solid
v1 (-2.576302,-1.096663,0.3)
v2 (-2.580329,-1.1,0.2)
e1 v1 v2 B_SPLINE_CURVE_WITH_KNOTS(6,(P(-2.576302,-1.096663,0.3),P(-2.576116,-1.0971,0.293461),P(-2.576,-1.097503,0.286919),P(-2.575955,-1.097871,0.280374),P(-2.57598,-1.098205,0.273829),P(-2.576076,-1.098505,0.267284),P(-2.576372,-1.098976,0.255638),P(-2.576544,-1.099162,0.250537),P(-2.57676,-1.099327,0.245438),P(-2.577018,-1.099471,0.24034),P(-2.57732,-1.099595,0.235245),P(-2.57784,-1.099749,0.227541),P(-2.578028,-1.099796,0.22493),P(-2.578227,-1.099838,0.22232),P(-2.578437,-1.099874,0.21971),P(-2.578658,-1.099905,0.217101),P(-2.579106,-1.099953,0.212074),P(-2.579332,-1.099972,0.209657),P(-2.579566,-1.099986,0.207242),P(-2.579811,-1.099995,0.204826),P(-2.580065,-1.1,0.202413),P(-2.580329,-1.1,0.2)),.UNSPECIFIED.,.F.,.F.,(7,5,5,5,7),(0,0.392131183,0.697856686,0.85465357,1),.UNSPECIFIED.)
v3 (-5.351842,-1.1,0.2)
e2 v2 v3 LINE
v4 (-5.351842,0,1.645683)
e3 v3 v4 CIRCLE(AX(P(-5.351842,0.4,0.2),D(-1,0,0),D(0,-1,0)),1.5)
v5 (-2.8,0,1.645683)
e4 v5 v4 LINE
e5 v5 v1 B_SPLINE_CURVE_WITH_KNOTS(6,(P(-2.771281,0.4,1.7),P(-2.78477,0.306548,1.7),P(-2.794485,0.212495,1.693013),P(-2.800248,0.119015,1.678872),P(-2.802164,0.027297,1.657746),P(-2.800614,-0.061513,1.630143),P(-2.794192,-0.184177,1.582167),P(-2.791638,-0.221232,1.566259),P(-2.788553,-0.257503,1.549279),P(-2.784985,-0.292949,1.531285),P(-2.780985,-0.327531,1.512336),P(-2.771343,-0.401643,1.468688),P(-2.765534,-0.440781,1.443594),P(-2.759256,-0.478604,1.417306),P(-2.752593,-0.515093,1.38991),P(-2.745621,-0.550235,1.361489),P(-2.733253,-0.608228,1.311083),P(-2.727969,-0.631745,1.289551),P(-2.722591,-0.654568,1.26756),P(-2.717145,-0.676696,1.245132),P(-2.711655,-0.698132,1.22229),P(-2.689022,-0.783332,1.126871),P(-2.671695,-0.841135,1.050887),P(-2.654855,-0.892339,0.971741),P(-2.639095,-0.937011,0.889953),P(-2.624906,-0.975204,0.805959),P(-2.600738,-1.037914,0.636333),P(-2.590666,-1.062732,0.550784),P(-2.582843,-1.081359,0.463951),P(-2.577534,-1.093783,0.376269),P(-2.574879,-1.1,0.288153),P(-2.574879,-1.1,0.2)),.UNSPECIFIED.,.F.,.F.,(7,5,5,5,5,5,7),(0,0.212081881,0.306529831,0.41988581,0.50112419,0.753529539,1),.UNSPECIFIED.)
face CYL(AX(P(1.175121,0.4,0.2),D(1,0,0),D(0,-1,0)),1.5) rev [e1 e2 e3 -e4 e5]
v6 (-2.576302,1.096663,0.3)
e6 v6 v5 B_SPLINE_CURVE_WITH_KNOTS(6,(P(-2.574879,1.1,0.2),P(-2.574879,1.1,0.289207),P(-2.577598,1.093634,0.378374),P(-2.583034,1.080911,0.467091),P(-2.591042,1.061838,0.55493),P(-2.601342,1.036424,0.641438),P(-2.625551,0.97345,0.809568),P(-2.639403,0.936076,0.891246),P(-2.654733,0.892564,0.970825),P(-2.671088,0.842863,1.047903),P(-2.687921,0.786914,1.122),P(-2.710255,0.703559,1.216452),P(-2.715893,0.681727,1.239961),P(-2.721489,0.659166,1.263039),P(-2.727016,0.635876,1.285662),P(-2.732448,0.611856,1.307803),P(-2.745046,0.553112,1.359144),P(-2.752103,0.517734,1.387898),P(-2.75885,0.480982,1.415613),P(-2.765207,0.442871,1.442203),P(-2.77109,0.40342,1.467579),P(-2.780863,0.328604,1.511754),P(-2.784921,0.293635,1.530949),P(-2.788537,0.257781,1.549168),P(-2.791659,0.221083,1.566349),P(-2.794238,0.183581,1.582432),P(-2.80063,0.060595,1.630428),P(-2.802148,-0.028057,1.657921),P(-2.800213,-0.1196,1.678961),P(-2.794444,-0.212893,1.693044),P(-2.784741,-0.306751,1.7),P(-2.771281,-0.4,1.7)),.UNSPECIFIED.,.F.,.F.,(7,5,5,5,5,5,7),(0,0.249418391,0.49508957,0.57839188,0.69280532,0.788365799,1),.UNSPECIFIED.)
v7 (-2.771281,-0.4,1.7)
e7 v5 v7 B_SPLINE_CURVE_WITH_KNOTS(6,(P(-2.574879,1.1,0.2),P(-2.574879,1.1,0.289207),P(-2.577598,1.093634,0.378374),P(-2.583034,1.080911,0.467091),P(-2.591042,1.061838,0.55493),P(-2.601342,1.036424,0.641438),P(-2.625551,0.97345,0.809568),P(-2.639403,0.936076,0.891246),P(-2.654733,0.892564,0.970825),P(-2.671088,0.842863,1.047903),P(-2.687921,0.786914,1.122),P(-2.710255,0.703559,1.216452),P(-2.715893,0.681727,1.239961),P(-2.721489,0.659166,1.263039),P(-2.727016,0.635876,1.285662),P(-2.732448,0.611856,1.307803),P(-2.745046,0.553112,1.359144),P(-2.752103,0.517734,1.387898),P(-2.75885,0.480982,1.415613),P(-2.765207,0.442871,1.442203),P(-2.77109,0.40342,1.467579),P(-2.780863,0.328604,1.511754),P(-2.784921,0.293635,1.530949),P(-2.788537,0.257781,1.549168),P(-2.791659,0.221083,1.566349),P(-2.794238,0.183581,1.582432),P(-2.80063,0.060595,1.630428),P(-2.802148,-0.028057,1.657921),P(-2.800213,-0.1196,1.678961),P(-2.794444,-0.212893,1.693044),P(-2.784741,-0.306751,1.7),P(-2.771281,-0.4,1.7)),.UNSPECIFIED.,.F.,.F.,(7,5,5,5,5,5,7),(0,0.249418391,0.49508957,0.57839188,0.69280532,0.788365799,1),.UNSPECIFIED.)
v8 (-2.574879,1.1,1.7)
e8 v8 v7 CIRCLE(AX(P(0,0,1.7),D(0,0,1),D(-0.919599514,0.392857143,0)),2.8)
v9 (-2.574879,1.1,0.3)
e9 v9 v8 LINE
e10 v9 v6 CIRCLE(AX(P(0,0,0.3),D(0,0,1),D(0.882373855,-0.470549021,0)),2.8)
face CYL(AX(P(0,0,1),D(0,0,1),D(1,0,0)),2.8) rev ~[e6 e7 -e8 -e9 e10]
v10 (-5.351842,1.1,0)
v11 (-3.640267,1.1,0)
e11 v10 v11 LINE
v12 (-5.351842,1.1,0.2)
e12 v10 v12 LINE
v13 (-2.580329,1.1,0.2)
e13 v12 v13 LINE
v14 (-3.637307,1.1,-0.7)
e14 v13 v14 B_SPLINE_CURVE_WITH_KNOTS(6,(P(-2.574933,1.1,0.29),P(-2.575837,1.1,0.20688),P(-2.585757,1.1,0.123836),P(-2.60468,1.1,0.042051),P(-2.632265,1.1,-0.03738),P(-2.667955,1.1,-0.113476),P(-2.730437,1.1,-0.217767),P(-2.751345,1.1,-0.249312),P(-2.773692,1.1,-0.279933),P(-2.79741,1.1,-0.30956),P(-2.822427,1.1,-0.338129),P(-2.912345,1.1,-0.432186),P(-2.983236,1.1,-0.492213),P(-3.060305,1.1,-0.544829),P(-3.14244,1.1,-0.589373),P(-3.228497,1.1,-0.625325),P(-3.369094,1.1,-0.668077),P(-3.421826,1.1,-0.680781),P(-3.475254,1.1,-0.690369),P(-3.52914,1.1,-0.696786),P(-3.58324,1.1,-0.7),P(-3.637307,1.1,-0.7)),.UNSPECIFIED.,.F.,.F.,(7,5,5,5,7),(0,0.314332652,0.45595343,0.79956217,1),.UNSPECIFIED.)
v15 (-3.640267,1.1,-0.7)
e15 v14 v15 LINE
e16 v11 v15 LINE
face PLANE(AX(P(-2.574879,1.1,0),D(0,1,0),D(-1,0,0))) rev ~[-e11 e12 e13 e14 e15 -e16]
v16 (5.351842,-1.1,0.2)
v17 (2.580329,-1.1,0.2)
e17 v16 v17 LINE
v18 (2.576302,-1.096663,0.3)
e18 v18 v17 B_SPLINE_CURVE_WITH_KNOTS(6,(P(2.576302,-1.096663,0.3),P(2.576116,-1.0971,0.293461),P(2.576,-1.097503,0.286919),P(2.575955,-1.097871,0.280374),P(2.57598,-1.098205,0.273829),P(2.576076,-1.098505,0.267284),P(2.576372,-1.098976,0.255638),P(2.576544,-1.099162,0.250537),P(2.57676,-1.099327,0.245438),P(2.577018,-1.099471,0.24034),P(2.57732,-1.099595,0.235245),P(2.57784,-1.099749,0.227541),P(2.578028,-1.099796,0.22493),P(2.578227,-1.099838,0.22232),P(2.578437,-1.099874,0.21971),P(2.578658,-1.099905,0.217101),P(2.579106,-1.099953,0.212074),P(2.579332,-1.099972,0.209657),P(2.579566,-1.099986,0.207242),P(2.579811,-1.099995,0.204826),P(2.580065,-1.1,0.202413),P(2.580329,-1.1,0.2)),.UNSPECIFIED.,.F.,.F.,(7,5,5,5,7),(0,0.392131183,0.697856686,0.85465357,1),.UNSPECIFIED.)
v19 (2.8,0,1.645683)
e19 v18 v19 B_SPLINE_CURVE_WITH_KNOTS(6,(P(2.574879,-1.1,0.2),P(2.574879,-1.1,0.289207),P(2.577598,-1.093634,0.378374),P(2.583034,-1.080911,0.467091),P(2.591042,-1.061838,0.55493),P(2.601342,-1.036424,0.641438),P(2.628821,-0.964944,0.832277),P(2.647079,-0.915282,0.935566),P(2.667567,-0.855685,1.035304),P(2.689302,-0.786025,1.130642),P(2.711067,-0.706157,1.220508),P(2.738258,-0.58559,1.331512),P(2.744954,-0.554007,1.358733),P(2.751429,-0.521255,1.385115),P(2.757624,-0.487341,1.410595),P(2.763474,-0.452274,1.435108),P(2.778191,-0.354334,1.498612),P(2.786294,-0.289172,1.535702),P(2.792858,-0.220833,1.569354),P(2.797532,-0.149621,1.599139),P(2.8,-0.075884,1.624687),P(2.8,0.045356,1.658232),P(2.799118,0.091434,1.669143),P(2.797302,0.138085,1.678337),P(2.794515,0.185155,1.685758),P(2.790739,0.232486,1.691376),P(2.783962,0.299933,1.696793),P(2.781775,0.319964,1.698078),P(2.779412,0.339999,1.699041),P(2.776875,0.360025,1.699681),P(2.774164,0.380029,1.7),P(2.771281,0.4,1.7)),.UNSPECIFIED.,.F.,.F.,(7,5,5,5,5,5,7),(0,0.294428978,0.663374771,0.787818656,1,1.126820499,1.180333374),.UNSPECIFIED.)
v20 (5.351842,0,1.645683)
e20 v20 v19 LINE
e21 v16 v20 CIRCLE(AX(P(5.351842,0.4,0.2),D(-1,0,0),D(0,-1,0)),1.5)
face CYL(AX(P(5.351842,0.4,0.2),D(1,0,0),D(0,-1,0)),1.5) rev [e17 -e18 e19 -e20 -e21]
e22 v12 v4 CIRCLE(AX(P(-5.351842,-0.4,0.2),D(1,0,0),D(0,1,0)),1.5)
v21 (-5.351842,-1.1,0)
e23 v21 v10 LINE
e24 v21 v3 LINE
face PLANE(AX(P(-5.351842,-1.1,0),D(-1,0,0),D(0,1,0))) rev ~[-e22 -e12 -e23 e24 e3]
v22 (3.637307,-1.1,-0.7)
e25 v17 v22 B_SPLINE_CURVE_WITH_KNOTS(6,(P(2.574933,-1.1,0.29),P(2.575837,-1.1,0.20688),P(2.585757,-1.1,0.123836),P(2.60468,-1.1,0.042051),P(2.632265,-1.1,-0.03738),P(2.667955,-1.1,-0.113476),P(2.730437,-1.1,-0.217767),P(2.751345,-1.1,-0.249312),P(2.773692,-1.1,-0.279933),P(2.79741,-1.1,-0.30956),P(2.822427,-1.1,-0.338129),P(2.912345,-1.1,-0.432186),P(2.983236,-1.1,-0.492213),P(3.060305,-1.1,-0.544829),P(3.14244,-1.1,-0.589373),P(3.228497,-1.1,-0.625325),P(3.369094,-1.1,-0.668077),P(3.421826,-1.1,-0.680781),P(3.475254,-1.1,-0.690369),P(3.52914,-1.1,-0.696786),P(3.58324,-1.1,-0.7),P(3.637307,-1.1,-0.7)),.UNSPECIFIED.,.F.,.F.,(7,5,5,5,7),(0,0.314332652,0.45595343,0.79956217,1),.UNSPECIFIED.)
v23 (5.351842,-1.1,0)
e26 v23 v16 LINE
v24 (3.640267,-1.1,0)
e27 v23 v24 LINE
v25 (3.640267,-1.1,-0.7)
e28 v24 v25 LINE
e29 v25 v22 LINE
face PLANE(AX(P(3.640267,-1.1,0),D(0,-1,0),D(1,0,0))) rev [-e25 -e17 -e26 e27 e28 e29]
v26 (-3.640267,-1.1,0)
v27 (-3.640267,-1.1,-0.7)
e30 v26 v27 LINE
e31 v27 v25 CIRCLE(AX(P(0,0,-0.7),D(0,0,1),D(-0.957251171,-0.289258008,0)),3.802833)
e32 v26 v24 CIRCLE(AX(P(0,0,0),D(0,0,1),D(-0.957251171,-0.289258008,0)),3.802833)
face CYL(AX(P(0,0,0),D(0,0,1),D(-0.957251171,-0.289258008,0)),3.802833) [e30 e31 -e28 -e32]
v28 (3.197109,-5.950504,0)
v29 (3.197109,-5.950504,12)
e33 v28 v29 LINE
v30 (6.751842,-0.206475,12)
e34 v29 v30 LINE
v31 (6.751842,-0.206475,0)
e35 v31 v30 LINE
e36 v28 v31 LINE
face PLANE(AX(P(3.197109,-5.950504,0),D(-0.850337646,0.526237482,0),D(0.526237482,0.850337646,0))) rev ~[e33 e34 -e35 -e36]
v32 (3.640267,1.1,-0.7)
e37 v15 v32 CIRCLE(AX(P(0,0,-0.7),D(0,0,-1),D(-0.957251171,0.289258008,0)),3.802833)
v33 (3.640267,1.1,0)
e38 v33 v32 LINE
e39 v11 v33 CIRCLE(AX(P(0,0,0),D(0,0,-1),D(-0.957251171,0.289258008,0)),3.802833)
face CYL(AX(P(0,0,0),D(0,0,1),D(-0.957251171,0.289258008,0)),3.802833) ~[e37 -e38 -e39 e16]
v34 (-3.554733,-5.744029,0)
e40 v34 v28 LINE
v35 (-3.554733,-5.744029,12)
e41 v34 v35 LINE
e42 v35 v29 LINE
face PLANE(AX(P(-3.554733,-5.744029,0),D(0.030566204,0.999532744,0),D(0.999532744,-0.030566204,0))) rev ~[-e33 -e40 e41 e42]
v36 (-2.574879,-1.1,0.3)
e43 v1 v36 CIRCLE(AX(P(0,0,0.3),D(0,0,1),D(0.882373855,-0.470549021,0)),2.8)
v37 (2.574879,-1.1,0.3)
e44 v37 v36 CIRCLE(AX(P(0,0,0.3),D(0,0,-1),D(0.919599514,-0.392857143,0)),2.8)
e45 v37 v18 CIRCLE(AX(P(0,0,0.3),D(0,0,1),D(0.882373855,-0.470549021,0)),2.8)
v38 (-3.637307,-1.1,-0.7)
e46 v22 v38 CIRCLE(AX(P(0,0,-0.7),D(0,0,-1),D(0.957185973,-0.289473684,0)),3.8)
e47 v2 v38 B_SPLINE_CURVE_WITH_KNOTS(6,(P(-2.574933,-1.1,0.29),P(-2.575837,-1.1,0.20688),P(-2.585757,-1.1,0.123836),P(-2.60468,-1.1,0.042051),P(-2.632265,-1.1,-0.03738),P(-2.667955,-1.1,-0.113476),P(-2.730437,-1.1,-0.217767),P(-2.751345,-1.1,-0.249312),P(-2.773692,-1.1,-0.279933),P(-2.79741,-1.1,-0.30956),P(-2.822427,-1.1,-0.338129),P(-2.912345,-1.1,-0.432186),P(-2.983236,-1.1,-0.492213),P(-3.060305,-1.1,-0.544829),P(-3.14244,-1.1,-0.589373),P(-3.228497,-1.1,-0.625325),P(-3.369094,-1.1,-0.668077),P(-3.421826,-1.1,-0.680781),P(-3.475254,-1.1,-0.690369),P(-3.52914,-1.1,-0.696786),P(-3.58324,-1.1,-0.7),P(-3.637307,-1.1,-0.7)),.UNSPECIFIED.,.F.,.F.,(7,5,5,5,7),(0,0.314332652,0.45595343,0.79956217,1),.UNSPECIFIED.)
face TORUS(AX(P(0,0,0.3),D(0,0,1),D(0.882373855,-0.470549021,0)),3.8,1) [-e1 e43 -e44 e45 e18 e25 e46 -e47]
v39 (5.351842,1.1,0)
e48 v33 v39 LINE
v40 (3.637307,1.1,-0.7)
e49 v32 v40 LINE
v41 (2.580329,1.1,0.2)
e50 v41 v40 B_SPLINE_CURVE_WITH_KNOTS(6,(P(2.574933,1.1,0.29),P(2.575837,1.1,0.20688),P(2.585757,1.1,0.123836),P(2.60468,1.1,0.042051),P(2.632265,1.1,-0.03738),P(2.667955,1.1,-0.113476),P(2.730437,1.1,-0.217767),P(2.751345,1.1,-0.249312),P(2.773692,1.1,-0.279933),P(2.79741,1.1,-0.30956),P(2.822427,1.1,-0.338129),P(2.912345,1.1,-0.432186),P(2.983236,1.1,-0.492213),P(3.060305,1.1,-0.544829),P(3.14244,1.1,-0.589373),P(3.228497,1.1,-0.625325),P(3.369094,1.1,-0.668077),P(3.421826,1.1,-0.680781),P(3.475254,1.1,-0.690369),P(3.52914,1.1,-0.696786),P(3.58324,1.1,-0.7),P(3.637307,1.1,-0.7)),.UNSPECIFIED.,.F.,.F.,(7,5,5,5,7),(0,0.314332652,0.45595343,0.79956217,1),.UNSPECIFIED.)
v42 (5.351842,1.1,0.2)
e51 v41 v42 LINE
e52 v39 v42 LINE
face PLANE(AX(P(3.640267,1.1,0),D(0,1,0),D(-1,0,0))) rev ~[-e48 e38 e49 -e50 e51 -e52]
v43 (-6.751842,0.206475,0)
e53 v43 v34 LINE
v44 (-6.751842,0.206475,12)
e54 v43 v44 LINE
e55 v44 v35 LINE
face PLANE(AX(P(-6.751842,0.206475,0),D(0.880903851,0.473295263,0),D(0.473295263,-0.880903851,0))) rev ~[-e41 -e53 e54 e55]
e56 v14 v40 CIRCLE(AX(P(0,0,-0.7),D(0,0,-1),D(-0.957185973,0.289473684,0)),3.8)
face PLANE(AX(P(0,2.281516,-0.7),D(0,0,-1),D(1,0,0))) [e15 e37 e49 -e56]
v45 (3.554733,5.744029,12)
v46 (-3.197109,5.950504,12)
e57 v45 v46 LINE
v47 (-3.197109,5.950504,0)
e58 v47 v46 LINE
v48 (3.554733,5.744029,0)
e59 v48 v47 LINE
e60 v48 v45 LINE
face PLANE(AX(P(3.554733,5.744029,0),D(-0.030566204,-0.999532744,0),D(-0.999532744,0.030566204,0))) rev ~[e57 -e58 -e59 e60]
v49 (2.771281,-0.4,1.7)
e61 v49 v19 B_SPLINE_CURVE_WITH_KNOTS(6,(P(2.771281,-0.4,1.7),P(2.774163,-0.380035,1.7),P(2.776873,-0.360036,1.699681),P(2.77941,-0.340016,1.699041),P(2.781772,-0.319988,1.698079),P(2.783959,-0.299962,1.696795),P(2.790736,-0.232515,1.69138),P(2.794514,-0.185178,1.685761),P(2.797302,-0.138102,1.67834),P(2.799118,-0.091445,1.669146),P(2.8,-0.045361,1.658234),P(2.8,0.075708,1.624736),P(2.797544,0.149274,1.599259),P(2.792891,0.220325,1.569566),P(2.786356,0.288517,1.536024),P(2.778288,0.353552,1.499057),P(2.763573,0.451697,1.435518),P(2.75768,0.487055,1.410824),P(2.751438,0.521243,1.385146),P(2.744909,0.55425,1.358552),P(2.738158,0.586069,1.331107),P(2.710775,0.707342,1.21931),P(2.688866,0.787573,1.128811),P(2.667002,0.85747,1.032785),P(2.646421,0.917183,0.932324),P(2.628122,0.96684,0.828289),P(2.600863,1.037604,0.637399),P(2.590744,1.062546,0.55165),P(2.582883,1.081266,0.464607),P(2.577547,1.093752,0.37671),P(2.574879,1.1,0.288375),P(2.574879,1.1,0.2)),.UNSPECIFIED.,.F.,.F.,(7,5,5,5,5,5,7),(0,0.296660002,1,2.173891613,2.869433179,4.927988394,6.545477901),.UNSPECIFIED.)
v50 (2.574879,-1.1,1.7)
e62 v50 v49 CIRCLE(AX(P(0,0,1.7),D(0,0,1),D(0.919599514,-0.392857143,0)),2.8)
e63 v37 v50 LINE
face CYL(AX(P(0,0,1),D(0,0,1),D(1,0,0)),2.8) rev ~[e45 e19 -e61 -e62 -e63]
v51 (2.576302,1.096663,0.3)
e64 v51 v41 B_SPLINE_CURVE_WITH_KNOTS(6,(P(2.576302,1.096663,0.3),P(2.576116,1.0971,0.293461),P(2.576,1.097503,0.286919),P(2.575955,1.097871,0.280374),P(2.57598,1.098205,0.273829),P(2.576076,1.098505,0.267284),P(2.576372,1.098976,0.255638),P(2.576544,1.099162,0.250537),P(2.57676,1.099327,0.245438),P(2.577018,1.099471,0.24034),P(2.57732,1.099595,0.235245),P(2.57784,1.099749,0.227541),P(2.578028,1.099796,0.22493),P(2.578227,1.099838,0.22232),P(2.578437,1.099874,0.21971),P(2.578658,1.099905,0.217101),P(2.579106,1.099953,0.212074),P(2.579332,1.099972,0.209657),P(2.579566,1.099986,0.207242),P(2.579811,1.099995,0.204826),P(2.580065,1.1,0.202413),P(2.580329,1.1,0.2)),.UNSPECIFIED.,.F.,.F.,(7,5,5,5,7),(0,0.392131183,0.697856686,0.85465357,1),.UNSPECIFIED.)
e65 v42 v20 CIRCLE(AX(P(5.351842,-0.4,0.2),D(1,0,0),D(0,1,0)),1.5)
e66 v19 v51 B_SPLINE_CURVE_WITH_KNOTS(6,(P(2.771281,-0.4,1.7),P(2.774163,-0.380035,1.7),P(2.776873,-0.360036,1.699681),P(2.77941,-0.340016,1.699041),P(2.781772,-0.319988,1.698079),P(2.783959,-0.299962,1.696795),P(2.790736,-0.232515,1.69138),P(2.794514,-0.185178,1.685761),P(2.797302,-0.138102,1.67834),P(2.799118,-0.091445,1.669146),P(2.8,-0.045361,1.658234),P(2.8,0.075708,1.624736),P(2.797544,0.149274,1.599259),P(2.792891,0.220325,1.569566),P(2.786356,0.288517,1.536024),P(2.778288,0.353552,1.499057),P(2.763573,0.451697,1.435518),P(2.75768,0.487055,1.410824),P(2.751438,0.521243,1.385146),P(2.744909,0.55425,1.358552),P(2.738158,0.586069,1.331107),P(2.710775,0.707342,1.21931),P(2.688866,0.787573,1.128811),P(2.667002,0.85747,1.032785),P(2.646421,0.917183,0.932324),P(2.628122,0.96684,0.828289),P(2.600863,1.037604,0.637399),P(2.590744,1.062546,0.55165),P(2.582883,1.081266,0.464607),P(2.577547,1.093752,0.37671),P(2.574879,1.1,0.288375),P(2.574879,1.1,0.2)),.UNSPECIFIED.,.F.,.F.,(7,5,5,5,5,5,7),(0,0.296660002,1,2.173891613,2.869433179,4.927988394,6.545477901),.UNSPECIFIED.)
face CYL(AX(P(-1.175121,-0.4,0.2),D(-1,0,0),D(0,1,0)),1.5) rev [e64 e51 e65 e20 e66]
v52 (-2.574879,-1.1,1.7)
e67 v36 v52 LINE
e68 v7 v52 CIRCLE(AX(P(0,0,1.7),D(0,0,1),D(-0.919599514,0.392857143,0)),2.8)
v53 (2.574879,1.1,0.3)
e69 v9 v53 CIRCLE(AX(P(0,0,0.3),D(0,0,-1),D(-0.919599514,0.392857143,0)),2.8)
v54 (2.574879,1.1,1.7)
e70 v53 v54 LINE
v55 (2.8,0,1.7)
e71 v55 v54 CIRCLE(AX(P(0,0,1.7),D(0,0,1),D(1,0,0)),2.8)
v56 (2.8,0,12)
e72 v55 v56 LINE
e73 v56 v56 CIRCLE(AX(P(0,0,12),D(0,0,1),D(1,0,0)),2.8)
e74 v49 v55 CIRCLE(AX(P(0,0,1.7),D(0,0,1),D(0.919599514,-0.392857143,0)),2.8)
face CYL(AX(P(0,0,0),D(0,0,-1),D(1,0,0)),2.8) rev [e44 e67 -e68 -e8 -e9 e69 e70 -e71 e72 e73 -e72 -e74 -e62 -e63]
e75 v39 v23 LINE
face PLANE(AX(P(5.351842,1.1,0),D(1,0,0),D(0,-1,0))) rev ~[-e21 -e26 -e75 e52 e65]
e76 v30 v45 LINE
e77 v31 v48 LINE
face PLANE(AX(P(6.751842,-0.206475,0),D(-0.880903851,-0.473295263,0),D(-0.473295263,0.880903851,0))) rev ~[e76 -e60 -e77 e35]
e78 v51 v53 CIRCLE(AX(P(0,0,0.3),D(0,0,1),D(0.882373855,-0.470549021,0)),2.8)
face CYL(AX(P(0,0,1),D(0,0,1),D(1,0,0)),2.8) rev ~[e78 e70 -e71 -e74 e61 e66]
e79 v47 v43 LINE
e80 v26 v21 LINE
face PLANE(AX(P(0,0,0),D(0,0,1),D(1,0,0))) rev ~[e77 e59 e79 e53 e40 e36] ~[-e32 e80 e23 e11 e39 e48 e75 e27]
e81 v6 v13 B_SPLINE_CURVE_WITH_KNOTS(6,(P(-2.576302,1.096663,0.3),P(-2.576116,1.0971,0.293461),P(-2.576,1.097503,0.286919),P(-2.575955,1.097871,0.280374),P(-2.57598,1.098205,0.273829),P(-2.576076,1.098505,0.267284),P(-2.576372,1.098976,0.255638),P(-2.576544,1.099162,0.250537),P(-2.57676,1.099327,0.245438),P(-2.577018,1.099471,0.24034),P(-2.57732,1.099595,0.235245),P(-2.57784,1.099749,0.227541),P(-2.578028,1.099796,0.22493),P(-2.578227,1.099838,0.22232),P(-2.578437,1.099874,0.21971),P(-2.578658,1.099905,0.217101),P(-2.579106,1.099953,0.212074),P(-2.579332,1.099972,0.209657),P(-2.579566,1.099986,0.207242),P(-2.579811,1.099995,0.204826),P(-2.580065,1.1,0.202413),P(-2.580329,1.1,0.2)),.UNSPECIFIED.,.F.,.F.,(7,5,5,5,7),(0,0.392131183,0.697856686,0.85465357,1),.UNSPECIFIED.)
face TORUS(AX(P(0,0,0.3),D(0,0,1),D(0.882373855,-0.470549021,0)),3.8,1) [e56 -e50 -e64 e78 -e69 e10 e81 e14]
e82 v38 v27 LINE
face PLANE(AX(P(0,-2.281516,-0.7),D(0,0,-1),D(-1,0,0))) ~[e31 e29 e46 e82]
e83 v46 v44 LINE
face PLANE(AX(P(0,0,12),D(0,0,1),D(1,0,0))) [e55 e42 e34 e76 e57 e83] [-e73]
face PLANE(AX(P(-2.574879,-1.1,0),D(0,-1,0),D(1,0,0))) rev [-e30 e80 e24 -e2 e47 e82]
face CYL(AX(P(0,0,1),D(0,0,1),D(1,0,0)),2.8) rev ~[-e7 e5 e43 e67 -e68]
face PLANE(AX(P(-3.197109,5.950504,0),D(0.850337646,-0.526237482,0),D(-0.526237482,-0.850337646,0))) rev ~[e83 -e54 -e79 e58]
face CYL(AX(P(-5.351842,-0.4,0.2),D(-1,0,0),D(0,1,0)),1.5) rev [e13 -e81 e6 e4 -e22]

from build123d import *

# Parameters (mm, degrees)
F0_R         = 3.5
F0_R_2       = 2.8
F1_DEPTH     = 12
F3_DEPTH     = 1.7
F5_DEPTH     = 0.7
F6_T4_DEPTH  = 6.526963201
F6_S5_R      = 2.8
F6_T6_DEPTH  = 5
F6_T10_DEPTH = 6.526963201
F6_S11_R     = 2.8
F6_T12_DEPTH = 5
F6_T16_DEPTH = 6.526963201
F6_S17_R     = 2.8
F6_T18_DEPTH = 5
F6_T22_DEPTH = 6.526963201
F6_S23_R     = 2.8
F6_T24_DEPTH = 5
F7_T2_ANGLE  = 236.1398810925
F7_T4_ANGLE  = 236.1398810925


# Not quite as in the source:
# - a fillet or chamfer that OpenCascade refuses, or shapes differently, is made with other operations: its cross-section is extruded or revolved along the edge and cut away or added
# - a pattern or mirror of a feature is missing from the dataset's text; its kind, count and spacing are read off the source's solid


with BuildPart() as f1:
    # F0 (on Top) → F1 (new body)
    with BuildSketch(Plane.XY):
        Polygon((3.1971086236, -5.9505038819), (6.7518418389, -0.2064746542), (3.5547332152, 5.7440292277), (-3.1971086236, 5.9505038819), (-6.7518418389, 0.2064746542), (-3.5547332152, -5.7440292277), align=None)
        Circle(F0_R, mode=Mode.SUBTRACT)
        Circle(F0_R)
        Circle(F0_R_2, mode=Mode.SUBTRACT)
    extrude(amount=F1_DEPTH)

    # F2 (on face) → F3 (cut)
    with BuildSketch(Plane(origin=(0, 0, 0), x_dir=(1, 0, 0), z_dir=(0, 0, -1))):
        with BuildLine():
            Line((-5.3518418389, -1.1), (-2.5748786379, -1.1))
            ThreePointArc((-2.5748786379, -1.1), (-2.8, 0), (-2.5748786379, 1.1))
            Line((-2.5748786379, 1.1), (-5.3518418389, 1.1))
            Line((-5.3518418389, 1.1), (-5.3518418389, -1.1))
        make_face()
        with BuildLine():
            Line((2.5748786379, -1.1), (5.3518418389, -1.1))
            Line((5.3518418389, -1.1), (5.3518418389, 1.1))
            Line((5.3518418389, 1.1), (2.5748786379, 1.1))
            ThreePointArc((2.5748786379, 1.1), (2.7431423756, 0.5613999527), (2.8, 0))
            ThreePointArc((2.8, 0), (2.7431423756, -0.5613999527), (2.5748786379, -1.1))
        make_face()
    extrude(amount=-F3_DEPTH, mode=Mode.SUBTRACT)

    # F4 (on face) → F5 (join)
    with BuildSketch(Plane(origin=(0, 0, 0), x_dir=(1, 0, 0), z_dir=(0, 0, -1))):
        with BuildLine():
            ThreePointArc((-3.6402666737, -1.1), (0, -3.8028333457), (3.6402666737, -1.1))
            Line((3.6402666737, -1.1), (2.5748786379, -1.1))
            ThreePointArc((2.5748786379, -1.1), (0, -2.8), (-2.5748786379, -1.1))
            Line((-2.5748786379, -1.1), (-3.6402666737, -1.1))
        make_face()
    f5 = extrude(amount=F5_DEPTH)

    # F5_copies: F5 across plane
    add(f5.mirror(Plane(origin=(0, 0, 0), x_dir=(0, 0, -1), z_dir=(0, -1, 0))))

    # F6: fillet of radius 1.5 on 4 edges, made by hand


with BuildPart() as f6_tool2:
    # F6_s3 → F6_t4 (new body)
    with BuildSketch(Plane.YZ.offset(-1.1751213621)):
        with BuildLine():
            ThreePointArc((1.1, 0.2), (0.6606601718, 1.2606601718), (-0.4, 1.7))
            Line((-0.4, 1.7), (1.1, 1.7))
            Line((1.1, 1.7), (1.1, 0.2))
        make_face()
    extrude(amount=F6_T4_DEPTH)

    # F6_s5 → F6_t6 (cut, symmetric)
    with BuildSketch(Plane.XY.offset(1)):
        Circle(F6_S5_R)
    extrude(amount=F6_T6_DEPTH, both=True, mode=Mode.SUBTRACT)


with BuildPart() as f1_1:
    add(f1.part)

    # F6_t1: union F6_tool2
    add(f6_tool2.part)


with BuildPart() as f6_tool8:
    # F6_s9 → F6_t10 (new body)
    with BuildSketch(Plane.YZ.offset(-5.3518418389)):
        with BuildLine():
            ThreePointArc((1.1, 0.2), (0.6606601718, 1.2606601718), (-0.4, 1.7))
            Line((-0.4, 1.7), (1.1, 1.7))
            Line((1.1, 1.7), (1.1, 0.2))
        make_face()
    extrude(amount=F6_T10_DEPTH)

    # F6_s11 → F6_t12 (cut, symmetric)
    with BuildSketch(Plane.XY.offset(1)):
        Circle(F6_S11_R)
    extrude(amount=F6_T12_DEPTH, both=True, mode=Mode.SUBTRACT)


with BuildPart() as f1_2:
    add(f1_1.part)

    # F6_t7: union F6_tool8
    add(f6_tool8.part)


with BuildPart() as f6_tool14:
    # F6_s15 → F6_t16 (new body)
    with BuildSketch(Plane.YZ.offset(5.3518418389)):
        with BuildLine():
            ThreePointArc((-1.1, 0.2), (-0.6606601718, 1.2606601718), (0.4, 1.7))
            Line((0.4, 1.7), (-1.1, 1.7))
            Line((-1.1, 1.7), (-1.1, 0.2))
        make_face()
    extrude(amount=-F6_T16_DEPTH)

    # F6_s17 → F6_t18 (cut, symmetric)
    with BuildSketch(Plane.XY.offset(1)):
        Circle(F6_S17_R)
    extrude(amount=F6_T18_DEPTH, both=True, mode=Mode.SUBTRACT)


with BuildPart() as f1_3:
    add(f1_2.part)

    # F6_t13: union F6_tool14
    add(f6_tool14.part)


with BuildPart() as f6_tool20:
    # F6_s21 → F6_t22 (new body)
    with BuildSketch(Plane.YZ.offset(1.1751213621)):
        with BuildLine():
            ThreePointArc((-1.1, 0.2), (-0.6606601718, 1.2606601718), (0.4, 1.7))
            Line((0.4, 1.7), (-1.1, 1.7))
            Line((-1.1, 1.7), (-1.1, 0.2))
        make_face()
    extrude(amount=-F6_T22_DEPTH)

    # F6_s23 → F6_t24 (cut, symmetric)
    with BuildSketch(Plane.XY.offset(1)):
        Circle(F6_S23_R)
    extrude(amount=F6_T24_DEPTH, both=True, mode=Mode.SUBTRACT)


with BuildPart() as f1_4:
    add(f1_3.part)

    # F6_t19: union F6_tool20
    add(f6_tool20.part)

    # F7: fillet of radius 1 on 2 edges, made by hand

    # F7_s1 → F7_t2 (revolve, cut)
    with BuildSketch(Plane(origin=(0, 0, 0), x_dir=(0, 0, 1), z_dir=(-0.4705490205, -0.8823738546, 0))):
        with BuildLine():
            ThreePointArc((0.3, -2.8), (-0.4071067812, -3.0928932188), (-0.7, -3.8))
            Line((-0.7, -3.8), (-0.7, -2.8))
            Line((-0.7, -2.8), (0.3, -2.8))
        make_face()
    revolve(axis=Axis((0, 0, -0.7), (0, 0, 1)), revolution_arc=F7_T2_ANGLE, mode=Mode.SUBTRACT)

    # F7_s3 → F7_t4 (revolve, cut)
    with BuildSketch(Plane(origin=(0, 0, 0), x_dir=(0, 0, 1), z_dir=(-0.4705490205, 0.8823738546, 0))):
        with BuildLine():
            ThreePointArc((0.3, 2.8), (-0.4071067812, 3.0928932188), (-0.7, 3.8))
            Line((-0.7, 3.8), (-0.7, 2.8))
            Line((-0.7, 2.8), (0.3, 2.8))
        make_face()
    revolve(axis=Axis((0, 0, -0.7), (0, 0, -1)), revolution_arc=F7_T4_ANGLE, mode=Mode.SUBTRACT)


solid = f1_4.part
